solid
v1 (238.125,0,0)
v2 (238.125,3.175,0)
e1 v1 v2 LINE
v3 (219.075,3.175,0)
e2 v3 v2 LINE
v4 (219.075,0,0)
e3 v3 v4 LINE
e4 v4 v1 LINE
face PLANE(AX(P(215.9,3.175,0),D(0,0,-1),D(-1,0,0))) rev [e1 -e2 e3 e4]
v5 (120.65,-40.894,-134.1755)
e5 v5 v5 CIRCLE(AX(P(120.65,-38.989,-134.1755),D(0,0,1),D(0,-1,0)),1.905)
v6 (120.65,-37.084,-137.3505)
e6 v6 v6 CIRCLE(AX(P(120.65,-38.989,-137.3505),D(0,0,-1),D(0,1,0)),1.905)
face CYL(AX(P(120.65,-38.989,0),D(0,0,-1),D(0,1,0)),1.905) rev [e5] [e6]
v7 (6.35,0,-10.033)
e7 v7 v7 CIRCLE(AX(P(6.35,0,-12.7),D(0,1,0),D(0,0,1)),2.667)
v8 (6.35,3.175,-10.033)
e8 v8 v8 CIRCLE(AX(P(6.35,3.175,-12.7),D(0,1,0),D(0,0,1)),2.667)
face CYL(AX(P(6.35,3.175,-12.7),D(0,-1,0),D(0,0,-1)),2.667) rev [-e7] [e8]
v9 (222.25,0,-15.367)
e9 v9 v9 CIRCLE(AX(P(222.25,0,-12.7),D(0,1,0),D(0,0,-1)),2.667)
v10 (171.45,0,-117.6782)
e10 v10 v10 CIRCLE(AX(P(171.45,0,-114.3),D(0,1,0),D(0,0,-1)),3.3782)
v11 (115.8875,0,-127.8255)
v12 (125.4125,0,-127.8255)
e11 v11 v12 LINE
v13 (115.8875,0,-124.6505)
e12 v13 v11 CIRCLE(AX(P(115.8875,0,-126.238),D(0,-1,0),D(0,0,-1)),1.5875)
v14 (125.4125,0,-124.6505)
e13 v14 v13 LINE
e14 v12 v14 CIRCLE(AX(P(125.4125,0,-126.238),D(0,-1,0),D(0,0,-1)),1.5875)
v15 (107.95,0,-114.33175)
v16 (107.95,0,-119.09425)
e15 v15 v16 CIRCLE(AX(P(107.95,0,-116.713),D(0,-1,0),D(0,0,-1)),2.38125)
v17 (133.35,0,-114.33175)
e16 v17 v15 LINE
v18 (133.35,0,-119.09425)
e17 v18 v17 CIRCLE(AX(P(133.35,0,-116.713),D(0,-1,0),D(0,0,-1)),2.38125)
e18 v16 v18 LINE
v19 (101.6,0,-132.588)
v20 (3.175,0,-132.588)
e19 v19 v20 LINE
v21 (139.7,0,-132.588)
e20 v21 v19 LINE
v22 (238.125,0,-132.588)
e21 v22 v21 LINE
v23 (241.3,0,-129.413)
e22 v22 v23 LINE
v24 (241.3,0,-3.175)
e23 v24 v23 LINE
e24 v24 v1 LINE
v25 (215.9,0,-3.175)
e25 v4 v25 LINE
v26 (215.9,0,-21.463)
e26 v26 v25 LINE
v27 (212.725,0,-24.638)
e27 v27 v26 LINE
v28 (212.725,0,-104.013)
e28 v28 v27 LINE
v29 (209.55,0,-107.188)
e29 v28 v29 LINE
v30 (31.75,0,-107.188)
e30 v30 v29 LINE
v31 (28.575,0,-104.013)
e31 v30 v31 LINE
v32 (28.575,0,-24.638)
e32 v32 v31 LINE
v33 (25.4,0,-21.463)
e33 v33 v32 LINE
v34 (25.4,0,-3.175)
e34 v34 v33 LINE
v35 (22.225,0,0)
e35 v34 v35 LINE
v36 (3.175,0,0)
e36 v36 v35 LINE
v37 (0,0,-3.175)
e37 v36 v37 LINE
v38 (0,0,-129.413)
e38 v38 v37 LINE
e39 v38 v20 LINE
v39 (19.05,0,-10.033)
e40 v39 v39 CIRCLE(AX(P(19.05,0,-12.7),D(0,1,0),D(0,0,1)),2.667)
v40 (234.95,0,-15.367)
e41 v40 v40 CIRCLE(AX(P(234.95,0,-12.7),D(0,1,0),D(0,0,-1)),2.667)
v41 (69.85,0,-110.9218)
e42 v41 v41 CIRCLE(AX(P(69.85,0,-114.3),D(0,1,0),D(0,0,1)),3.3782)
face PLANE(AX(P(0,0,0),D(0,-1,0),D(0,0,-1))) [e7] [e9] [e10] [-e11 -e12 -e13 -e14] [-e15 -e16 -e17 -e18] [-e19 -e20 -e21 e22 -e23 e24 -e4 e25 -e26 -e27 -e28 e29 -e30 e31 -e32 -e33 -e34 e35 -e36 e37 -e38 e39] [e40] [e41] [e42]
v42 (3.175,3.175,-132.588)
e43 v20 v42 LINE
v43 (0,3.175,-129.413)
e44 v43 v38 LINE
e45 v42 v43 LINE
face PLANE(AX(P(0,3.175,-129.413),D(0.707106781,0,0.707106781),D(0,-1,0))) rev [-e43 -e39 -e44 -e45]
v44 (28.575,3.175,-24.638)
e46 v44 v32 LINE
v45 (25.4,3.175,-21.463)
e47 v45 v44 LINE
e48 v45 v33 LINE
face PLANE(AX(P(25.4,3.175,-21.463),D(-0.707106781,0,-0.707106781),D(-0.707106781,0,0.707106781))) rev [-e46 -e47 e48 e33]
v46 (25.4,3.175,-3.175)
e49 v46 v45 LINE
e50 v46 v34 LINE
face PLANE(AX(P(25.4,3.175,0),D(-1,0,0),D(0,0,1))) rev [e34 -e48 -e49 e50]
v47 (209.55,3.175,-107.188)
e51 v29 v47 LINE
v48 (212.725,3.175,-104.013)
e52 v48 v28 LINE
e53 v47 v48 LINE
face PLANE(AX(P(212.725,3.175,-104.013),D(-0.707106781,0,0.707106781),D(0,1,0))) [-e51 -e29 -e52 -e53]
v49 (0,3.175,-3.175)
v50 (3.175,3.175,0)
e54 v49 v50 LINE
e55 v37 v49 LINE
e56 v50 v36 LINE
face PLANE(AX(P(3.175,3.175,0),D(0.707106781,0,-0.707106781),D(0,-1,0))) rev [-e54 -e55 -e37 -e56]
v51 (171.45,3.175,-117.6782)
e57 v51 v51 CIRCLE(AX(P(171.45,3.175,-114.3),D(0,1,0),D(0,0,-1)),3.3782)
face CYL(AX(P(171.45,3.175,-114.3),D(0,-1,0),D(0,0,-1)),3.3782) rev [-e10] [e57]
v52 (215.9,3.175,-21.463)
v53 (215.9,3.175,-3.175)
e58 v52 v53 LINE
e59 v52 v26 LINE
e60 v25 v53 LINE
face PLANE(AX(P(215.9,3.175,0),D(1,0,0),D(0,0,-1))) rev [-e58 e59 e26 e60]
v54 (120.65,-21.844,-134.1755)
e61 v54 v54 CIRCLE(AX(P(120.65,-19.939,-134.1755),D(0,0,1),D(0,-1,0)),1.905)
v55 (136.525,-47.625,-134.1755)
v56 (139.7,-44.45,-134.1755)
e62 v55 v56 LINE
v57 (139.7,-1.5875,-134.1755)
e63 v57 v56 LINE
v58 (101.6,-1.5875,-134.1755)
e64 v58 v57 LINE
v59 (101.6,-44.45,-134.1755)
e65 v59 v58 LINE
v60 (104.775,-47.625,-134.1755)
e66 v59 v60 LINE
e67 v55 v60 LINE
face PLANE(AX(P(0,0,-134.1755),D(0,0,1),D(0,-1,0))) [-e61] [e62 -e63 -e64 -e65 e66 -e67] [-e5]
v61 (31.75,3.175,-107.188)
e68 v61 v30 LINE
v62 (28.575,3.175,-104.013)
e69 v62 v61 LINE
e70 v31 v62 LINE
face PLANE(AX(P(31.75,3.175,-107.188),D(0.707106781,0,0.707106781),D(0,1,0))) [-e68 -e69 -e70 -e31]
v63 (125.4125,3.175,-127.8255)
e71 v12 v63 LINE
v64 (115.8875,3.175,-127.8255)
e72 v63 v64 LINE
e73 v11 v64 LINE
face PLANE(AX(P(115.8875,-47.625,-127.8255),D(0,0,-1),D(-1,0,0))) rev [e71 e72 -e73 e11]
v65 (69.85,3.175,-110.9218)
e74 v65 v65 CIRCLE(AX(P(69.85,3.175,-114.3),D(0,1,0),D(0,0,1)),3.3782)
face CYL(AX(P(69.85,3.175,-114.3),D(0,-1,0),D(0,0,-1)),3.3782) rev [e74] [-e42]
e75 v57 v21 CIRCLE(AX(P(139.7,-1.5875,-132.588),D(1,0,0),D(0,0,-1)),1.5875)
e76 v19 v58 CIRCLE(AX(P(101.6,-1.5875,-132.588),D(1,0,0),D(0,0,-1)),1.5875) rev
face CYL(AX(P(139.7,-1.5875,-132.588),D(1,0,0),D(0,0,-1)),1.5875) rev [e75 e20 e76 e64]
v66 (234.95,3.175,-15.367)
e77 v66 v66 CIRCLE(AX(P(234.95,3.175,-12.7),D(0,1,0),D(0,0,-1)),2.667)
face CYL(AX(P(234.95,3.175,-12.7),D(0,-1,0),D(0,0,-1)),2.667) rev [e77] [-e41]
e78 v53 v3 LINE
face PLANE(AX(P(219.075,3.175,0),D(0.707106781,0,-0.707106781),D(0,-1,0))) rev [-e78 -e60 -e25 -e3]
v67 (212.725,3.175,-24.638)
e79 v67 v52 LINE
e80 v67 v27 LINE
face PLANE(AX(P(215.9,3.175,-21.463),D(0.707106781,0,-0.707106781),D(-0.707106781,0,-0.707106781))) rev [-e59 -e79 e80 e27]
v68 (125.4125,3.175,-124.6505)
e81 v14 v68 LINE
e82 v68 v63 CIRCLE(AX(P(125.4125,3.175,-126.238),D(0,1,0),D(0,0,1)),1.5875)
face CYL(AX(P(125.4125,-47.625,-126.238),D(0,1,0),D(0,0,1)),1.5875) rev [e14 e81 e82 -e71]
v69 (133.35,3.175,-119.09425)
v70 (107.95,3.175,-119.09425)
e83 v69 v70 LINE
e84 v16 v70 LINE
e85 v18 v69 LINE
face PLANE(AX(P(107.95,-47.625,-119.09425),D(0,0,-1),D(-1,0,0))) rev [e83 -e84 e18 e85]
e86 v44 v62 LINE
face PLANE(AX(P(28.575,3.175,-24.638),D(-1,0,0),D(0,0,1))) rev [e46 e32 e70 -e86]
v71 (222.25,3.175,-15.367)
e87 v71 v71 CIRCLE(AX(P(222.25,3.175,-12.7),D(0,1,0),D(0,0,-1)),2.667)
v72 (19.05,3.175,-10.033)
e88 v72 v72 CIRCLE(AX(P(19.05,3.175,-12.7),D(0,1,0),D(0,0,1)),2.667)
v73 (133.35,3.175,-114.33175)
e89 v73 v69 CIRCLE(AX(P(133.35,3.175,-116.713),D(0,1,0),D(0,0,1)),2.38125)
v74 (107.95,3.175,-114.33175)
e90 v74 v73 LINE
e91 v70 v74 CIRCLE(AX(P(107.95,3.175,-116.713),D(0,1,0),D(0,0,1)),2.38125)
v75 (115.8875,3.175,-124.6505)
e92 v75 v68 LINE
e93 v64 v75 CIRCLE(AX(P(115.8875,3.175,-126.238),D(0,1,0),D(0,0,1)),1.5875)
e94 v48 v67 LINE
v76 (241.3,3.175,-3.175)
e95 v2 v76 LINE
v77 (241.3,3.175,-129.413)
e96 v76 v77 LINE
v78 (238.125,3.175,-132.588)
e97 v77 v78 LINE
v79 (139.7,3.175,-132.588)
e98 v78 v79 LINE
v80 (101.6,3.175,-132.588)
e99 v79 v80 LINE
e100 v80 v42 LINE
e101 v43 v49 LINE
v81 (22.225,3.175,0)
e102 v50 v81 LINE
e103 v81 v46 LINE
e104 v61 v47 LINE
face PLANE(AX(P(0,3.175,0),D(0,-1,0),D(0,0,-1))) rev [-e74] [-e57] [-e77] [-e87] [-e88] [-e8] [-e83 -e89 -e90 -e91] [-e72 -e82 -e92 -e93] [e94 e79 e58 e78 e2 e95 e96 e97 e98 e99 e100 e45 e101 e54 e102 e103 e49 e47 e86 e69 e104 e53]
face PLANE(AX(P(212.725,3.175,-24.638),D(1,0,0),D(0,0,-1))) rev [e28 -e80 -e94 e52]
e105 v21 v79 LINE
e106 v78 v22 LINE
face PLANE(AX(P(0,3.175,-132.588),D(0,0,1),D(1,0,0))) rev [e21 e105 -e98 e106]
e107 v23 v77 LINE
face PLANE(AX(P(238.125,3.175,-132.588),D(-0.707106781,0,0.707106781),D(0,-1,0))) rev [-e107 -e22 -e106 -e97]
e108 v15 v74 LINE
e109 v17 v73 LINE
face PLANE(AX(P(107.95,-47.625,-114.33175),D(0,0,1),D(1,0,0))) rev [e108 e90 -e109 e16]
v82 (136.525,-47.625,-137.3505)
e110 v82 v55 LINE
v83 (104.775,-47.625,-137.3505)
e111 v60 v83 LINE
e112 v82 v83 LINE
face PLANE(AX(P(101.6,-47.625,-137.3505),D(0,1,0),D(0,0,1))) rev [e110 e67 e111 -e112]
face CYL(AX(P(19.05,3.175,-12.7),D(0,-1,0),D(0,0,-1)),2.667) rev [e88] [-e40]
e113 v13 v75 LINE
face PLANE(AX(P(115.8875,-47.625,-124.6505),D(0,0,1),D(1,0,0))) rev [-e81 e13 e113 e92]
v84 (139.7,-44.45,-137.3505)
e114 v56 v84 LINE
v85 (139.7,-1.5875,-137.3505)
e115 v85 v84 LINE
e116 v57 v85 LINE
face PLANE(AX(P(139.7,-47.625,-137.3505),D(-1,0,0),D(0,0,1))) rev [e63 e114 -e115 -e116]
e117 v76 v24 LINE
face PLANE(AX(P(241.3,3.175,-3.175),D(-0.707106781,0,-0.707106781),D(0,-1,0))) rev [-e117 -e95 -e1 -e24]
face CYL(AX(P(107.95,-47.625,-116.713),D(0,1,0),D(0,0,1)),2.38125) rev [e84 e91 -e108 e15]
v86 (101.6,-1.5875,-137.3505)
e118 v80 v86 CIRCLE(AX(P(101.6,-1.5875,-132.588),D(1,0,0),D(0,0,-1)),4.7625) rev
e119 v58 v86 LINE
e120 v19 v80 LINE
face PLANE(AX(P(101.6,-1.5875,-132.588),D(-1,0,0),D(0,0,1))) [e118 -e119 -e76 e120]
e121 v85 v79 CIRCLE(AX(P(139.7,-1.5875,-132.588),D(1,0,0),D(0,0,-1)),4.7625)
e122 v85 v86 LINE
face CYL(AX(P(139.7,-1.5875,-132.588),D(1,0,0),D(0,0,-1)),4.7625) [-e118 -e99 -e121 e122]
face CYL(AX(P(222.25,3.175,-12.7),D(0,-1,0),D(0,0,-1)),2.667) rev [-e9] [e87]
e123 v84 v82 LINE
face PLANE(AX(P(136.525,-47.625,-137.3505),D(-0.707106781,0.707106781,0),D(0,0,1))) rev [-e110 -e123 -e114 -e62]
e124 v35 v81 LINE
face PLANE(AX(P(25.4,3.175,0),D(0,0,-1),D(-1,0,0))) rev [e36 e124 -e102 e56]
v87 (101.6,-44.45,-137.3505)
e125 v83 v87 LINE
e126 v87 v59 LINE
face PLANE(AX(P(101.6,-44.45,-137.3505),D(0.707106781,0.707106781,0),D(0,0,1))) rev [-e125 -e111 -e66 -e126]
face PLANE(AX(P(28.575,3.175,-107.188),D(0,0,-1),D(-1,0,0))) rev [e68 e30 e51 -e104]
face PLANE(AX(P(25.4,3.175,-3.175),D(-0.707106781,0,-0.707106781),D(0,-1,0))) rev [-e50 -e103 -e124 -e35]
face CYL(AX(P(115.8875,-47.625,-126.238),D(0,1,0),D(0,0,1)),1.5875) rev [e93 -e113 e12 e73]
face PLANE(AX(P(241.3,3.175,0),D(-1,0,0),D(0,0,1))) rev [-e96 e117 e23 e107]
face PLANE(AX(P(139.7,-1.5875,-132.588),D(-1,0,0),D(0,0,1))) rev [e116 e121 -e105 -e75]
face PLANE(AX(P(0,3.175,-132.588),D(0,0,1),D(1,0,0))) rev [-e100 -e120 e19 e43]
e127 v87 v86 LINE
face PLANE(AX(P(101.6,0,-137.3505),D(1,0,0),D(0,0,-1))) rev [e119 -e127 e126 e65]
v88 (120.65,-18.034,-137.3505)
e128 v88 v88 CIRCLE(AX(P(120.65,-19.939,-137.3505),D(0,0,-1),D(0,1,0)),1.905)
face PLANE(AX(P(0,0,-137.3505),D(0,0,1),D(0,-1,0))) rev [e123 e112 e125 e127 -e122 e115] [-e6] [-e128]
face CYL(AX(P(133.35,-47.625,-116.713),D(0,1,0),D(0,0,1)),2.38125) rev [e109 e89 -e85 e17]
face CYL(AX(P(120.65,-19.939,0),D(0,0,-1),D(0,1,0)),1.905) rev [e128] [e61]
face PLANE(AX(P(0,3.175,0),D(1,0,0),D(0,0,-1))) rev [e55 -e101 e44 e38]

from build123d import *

# Parameters (mm, degrees)
SKETCH1_R          = 2.667
SKETCH1_R_2        = 3.3782
BASE_FLANGE1_DEPTH = 3.175
CHAMFER2_SIZE      = 3.175
EDGE_FLANGE1_DEPTH = 38.1
CHAMFER3_SIZE      = 3.175
SKETCH9_R          = 1.905
CUT_EXTRUDE1_DEPTH = 282.707277995
CUT_EXTRUDE2_DEPTH = 283.261385688
CUT_EXTRUDE3_DEPTH = 283.261385688


# Sheet-metal steps are written as plain solids
with BuildPart() as part:
    # Sketch1 → Base-Flange1 (new body)
    with BuildSketch(Plane(origin=(0, 0, 0), x_dir=(1, 0, 0), z_dir=(0, 1, 0))):
        Polygon((25.4, 0), (0, 0), (0, 132.588), (241.3, 132.588), (241.3, 0), (215.9, 0), (215.9, 21.463), (212.725, 24.638), (212.725, 107.188), (28.575, 107.188), (28.575, 24.638), (25.4, 21.463), align=None)
        with Locations(Location((6.35, 12.7, 0), (0, 0, 270))):
            Circle(SKETCH1_R, mode=Mode.SUBTRACT)
        with Locations(Location((19.05, 12.7, 0), (0, 0, 270))):
            Circle(SKETCH1_R, mode=Mode.SUBTRACT)
        with Locations(Location((222.25, 12.7, 0), (0, 0, 90))):
            Circle(SKETCH1_R, mode=Mode.SUBTRACT)
        with Locations(Location((234.95, 12.7, 0), (0, 0, 90))):
            Circle(SKETCH1_R, mode=Mode.SUBTRACT)
        with Locations(Location((69.85, 114.3, 0), (0, 0, 270))):
            Circle(SKETCH1_R_2, mode=Mode.SUBTRACT)
        with Locations(Location((171.45, 114.3, 0), (0, 0, 90))):
            Circle(SKETCH1_R_2, mode=Mode.SUBTRACT)
    extrude(amount=BASE_FLANGE1_DEPTH)

    # Chamfer2
    chamfer2_edges = [part.edges().sort_by_distance(p)[0] for p in [
        (0, 1.5875, -132.588),
        (241.3, 1.5875, -132.588),
        (241.3, 1.5875, 0),
        (215.9, 1.5875, 0),
        (212.725, 1.5875, -107.188),
        (28.575, 1.5875, -107.188),
        (25.4, 1.5875, 0),
        (0, 1.5875, 0),
    ]]
    chamfer(chamfer2_edges, length=CHAMFER2_SIZE)

    # Edge-Flange1 section (across the edge) → Edge-Flange1 (add)
    with BuildSketch(Plane(origin=(101.6, 0, -134.1755), x_dir=(0, 0, 1), z_dir=(1, 0, 0))):
        with BuildLine():
            Line((-3.175, 1.5875), (-3.175, 47.625))
            Line((-3.175, 47.625), (0, 47.625))
            Line((0, 47.625), (0, 1.5875))
            ThreePointArc((0, 1.5875), (0.464967985, 0.464967985), (1.5875, 0))
            Line((1.5875, 0), (1.5875, -3.175))
            ThreePointArc((1.5875, -3.175), (-1.780096045, -1.780096045), (-3.175, 1.5875))
        make_face()
    extrude(amount=EDGE_FLANGE1_DEPTH)

    # Chamfer3
    chamfer3_edges = [part.edges().sort_by_distance(p)[0] for p in [
        (101.6, -47.625, -135.763),
        (139.7, -47.625, -135.763),
    ]]
    chamfer(chamfer3_edges, length=CHAMFER3_SIZE)

    # Sketch9 → Cut-Extrude1 (cut, through all)
    with BuildSketch(Plane(origin=(0, 0, -137.3505), x_dir=(-1, 0, 0), z_dir=(0, 0, -1))):
        with Locations(Location((-120.65, -38.989, 0), (0, 0, 90))):
            Circle(SKETCH9_R)
        with Locations(Location((-120.65, -19.939, 0), (0, 0, 90))):
            Circle(SKETCH9_R)
    extrude(amount=-CUT_EXTRUDE1_DEPTH, mode=Mode.SUBTRACT)

    # Sketch10 → Cut-Extrude2 (cut, through all)
    with BuildSketch(Plane(origin=(0, 3.175, 0), x_dir=(1, 0, 0), z_dir=(0, 1, 0))):
        with BuildLine():
            Line((115.8875, 127.8255), (125.4125, 127.8255))
            ThreePointArc((125.4125, 127.8255), (127, 126.238), (125.4125, 124.6505))
            Line((125.4125, 124.6505), (115.8875, 124.6505))
            ThreePointArc((115.8875, 124.6505), (114.3, 126.238), (115.8875, 127.8255))
        make_face()
    extrude(amount=-CUT_EXTRUDE2_DEPTH, mode=Mode.SUBTRACT)

    # Sketch11 → Cut-Extrude3 (cut, through all)
    with BuildSketch(Plane(origin=(0, 3.175, 0), x_dir=(1, 0, 0), z_dir=(0, 1, 0))):
        with BuildLine():
            Line((107.95, 119.09425), (133.35, 119.09425))
            ThreePointArc((133.35, 119.09425), (135.73125, 116.713), (133.35, 114.33175))
            Line((133.35, 114.33175), (107.95, 114.33175))
            ThreePointArc((107.95, 114.33175), (105.56875, 116.713), (107.95, 119.09425))
        make_face()
    extrude(amount=-CUT_EXTRUDE3_DEPTH, mode=Mode.SUBTRACT)


solid = part.part
